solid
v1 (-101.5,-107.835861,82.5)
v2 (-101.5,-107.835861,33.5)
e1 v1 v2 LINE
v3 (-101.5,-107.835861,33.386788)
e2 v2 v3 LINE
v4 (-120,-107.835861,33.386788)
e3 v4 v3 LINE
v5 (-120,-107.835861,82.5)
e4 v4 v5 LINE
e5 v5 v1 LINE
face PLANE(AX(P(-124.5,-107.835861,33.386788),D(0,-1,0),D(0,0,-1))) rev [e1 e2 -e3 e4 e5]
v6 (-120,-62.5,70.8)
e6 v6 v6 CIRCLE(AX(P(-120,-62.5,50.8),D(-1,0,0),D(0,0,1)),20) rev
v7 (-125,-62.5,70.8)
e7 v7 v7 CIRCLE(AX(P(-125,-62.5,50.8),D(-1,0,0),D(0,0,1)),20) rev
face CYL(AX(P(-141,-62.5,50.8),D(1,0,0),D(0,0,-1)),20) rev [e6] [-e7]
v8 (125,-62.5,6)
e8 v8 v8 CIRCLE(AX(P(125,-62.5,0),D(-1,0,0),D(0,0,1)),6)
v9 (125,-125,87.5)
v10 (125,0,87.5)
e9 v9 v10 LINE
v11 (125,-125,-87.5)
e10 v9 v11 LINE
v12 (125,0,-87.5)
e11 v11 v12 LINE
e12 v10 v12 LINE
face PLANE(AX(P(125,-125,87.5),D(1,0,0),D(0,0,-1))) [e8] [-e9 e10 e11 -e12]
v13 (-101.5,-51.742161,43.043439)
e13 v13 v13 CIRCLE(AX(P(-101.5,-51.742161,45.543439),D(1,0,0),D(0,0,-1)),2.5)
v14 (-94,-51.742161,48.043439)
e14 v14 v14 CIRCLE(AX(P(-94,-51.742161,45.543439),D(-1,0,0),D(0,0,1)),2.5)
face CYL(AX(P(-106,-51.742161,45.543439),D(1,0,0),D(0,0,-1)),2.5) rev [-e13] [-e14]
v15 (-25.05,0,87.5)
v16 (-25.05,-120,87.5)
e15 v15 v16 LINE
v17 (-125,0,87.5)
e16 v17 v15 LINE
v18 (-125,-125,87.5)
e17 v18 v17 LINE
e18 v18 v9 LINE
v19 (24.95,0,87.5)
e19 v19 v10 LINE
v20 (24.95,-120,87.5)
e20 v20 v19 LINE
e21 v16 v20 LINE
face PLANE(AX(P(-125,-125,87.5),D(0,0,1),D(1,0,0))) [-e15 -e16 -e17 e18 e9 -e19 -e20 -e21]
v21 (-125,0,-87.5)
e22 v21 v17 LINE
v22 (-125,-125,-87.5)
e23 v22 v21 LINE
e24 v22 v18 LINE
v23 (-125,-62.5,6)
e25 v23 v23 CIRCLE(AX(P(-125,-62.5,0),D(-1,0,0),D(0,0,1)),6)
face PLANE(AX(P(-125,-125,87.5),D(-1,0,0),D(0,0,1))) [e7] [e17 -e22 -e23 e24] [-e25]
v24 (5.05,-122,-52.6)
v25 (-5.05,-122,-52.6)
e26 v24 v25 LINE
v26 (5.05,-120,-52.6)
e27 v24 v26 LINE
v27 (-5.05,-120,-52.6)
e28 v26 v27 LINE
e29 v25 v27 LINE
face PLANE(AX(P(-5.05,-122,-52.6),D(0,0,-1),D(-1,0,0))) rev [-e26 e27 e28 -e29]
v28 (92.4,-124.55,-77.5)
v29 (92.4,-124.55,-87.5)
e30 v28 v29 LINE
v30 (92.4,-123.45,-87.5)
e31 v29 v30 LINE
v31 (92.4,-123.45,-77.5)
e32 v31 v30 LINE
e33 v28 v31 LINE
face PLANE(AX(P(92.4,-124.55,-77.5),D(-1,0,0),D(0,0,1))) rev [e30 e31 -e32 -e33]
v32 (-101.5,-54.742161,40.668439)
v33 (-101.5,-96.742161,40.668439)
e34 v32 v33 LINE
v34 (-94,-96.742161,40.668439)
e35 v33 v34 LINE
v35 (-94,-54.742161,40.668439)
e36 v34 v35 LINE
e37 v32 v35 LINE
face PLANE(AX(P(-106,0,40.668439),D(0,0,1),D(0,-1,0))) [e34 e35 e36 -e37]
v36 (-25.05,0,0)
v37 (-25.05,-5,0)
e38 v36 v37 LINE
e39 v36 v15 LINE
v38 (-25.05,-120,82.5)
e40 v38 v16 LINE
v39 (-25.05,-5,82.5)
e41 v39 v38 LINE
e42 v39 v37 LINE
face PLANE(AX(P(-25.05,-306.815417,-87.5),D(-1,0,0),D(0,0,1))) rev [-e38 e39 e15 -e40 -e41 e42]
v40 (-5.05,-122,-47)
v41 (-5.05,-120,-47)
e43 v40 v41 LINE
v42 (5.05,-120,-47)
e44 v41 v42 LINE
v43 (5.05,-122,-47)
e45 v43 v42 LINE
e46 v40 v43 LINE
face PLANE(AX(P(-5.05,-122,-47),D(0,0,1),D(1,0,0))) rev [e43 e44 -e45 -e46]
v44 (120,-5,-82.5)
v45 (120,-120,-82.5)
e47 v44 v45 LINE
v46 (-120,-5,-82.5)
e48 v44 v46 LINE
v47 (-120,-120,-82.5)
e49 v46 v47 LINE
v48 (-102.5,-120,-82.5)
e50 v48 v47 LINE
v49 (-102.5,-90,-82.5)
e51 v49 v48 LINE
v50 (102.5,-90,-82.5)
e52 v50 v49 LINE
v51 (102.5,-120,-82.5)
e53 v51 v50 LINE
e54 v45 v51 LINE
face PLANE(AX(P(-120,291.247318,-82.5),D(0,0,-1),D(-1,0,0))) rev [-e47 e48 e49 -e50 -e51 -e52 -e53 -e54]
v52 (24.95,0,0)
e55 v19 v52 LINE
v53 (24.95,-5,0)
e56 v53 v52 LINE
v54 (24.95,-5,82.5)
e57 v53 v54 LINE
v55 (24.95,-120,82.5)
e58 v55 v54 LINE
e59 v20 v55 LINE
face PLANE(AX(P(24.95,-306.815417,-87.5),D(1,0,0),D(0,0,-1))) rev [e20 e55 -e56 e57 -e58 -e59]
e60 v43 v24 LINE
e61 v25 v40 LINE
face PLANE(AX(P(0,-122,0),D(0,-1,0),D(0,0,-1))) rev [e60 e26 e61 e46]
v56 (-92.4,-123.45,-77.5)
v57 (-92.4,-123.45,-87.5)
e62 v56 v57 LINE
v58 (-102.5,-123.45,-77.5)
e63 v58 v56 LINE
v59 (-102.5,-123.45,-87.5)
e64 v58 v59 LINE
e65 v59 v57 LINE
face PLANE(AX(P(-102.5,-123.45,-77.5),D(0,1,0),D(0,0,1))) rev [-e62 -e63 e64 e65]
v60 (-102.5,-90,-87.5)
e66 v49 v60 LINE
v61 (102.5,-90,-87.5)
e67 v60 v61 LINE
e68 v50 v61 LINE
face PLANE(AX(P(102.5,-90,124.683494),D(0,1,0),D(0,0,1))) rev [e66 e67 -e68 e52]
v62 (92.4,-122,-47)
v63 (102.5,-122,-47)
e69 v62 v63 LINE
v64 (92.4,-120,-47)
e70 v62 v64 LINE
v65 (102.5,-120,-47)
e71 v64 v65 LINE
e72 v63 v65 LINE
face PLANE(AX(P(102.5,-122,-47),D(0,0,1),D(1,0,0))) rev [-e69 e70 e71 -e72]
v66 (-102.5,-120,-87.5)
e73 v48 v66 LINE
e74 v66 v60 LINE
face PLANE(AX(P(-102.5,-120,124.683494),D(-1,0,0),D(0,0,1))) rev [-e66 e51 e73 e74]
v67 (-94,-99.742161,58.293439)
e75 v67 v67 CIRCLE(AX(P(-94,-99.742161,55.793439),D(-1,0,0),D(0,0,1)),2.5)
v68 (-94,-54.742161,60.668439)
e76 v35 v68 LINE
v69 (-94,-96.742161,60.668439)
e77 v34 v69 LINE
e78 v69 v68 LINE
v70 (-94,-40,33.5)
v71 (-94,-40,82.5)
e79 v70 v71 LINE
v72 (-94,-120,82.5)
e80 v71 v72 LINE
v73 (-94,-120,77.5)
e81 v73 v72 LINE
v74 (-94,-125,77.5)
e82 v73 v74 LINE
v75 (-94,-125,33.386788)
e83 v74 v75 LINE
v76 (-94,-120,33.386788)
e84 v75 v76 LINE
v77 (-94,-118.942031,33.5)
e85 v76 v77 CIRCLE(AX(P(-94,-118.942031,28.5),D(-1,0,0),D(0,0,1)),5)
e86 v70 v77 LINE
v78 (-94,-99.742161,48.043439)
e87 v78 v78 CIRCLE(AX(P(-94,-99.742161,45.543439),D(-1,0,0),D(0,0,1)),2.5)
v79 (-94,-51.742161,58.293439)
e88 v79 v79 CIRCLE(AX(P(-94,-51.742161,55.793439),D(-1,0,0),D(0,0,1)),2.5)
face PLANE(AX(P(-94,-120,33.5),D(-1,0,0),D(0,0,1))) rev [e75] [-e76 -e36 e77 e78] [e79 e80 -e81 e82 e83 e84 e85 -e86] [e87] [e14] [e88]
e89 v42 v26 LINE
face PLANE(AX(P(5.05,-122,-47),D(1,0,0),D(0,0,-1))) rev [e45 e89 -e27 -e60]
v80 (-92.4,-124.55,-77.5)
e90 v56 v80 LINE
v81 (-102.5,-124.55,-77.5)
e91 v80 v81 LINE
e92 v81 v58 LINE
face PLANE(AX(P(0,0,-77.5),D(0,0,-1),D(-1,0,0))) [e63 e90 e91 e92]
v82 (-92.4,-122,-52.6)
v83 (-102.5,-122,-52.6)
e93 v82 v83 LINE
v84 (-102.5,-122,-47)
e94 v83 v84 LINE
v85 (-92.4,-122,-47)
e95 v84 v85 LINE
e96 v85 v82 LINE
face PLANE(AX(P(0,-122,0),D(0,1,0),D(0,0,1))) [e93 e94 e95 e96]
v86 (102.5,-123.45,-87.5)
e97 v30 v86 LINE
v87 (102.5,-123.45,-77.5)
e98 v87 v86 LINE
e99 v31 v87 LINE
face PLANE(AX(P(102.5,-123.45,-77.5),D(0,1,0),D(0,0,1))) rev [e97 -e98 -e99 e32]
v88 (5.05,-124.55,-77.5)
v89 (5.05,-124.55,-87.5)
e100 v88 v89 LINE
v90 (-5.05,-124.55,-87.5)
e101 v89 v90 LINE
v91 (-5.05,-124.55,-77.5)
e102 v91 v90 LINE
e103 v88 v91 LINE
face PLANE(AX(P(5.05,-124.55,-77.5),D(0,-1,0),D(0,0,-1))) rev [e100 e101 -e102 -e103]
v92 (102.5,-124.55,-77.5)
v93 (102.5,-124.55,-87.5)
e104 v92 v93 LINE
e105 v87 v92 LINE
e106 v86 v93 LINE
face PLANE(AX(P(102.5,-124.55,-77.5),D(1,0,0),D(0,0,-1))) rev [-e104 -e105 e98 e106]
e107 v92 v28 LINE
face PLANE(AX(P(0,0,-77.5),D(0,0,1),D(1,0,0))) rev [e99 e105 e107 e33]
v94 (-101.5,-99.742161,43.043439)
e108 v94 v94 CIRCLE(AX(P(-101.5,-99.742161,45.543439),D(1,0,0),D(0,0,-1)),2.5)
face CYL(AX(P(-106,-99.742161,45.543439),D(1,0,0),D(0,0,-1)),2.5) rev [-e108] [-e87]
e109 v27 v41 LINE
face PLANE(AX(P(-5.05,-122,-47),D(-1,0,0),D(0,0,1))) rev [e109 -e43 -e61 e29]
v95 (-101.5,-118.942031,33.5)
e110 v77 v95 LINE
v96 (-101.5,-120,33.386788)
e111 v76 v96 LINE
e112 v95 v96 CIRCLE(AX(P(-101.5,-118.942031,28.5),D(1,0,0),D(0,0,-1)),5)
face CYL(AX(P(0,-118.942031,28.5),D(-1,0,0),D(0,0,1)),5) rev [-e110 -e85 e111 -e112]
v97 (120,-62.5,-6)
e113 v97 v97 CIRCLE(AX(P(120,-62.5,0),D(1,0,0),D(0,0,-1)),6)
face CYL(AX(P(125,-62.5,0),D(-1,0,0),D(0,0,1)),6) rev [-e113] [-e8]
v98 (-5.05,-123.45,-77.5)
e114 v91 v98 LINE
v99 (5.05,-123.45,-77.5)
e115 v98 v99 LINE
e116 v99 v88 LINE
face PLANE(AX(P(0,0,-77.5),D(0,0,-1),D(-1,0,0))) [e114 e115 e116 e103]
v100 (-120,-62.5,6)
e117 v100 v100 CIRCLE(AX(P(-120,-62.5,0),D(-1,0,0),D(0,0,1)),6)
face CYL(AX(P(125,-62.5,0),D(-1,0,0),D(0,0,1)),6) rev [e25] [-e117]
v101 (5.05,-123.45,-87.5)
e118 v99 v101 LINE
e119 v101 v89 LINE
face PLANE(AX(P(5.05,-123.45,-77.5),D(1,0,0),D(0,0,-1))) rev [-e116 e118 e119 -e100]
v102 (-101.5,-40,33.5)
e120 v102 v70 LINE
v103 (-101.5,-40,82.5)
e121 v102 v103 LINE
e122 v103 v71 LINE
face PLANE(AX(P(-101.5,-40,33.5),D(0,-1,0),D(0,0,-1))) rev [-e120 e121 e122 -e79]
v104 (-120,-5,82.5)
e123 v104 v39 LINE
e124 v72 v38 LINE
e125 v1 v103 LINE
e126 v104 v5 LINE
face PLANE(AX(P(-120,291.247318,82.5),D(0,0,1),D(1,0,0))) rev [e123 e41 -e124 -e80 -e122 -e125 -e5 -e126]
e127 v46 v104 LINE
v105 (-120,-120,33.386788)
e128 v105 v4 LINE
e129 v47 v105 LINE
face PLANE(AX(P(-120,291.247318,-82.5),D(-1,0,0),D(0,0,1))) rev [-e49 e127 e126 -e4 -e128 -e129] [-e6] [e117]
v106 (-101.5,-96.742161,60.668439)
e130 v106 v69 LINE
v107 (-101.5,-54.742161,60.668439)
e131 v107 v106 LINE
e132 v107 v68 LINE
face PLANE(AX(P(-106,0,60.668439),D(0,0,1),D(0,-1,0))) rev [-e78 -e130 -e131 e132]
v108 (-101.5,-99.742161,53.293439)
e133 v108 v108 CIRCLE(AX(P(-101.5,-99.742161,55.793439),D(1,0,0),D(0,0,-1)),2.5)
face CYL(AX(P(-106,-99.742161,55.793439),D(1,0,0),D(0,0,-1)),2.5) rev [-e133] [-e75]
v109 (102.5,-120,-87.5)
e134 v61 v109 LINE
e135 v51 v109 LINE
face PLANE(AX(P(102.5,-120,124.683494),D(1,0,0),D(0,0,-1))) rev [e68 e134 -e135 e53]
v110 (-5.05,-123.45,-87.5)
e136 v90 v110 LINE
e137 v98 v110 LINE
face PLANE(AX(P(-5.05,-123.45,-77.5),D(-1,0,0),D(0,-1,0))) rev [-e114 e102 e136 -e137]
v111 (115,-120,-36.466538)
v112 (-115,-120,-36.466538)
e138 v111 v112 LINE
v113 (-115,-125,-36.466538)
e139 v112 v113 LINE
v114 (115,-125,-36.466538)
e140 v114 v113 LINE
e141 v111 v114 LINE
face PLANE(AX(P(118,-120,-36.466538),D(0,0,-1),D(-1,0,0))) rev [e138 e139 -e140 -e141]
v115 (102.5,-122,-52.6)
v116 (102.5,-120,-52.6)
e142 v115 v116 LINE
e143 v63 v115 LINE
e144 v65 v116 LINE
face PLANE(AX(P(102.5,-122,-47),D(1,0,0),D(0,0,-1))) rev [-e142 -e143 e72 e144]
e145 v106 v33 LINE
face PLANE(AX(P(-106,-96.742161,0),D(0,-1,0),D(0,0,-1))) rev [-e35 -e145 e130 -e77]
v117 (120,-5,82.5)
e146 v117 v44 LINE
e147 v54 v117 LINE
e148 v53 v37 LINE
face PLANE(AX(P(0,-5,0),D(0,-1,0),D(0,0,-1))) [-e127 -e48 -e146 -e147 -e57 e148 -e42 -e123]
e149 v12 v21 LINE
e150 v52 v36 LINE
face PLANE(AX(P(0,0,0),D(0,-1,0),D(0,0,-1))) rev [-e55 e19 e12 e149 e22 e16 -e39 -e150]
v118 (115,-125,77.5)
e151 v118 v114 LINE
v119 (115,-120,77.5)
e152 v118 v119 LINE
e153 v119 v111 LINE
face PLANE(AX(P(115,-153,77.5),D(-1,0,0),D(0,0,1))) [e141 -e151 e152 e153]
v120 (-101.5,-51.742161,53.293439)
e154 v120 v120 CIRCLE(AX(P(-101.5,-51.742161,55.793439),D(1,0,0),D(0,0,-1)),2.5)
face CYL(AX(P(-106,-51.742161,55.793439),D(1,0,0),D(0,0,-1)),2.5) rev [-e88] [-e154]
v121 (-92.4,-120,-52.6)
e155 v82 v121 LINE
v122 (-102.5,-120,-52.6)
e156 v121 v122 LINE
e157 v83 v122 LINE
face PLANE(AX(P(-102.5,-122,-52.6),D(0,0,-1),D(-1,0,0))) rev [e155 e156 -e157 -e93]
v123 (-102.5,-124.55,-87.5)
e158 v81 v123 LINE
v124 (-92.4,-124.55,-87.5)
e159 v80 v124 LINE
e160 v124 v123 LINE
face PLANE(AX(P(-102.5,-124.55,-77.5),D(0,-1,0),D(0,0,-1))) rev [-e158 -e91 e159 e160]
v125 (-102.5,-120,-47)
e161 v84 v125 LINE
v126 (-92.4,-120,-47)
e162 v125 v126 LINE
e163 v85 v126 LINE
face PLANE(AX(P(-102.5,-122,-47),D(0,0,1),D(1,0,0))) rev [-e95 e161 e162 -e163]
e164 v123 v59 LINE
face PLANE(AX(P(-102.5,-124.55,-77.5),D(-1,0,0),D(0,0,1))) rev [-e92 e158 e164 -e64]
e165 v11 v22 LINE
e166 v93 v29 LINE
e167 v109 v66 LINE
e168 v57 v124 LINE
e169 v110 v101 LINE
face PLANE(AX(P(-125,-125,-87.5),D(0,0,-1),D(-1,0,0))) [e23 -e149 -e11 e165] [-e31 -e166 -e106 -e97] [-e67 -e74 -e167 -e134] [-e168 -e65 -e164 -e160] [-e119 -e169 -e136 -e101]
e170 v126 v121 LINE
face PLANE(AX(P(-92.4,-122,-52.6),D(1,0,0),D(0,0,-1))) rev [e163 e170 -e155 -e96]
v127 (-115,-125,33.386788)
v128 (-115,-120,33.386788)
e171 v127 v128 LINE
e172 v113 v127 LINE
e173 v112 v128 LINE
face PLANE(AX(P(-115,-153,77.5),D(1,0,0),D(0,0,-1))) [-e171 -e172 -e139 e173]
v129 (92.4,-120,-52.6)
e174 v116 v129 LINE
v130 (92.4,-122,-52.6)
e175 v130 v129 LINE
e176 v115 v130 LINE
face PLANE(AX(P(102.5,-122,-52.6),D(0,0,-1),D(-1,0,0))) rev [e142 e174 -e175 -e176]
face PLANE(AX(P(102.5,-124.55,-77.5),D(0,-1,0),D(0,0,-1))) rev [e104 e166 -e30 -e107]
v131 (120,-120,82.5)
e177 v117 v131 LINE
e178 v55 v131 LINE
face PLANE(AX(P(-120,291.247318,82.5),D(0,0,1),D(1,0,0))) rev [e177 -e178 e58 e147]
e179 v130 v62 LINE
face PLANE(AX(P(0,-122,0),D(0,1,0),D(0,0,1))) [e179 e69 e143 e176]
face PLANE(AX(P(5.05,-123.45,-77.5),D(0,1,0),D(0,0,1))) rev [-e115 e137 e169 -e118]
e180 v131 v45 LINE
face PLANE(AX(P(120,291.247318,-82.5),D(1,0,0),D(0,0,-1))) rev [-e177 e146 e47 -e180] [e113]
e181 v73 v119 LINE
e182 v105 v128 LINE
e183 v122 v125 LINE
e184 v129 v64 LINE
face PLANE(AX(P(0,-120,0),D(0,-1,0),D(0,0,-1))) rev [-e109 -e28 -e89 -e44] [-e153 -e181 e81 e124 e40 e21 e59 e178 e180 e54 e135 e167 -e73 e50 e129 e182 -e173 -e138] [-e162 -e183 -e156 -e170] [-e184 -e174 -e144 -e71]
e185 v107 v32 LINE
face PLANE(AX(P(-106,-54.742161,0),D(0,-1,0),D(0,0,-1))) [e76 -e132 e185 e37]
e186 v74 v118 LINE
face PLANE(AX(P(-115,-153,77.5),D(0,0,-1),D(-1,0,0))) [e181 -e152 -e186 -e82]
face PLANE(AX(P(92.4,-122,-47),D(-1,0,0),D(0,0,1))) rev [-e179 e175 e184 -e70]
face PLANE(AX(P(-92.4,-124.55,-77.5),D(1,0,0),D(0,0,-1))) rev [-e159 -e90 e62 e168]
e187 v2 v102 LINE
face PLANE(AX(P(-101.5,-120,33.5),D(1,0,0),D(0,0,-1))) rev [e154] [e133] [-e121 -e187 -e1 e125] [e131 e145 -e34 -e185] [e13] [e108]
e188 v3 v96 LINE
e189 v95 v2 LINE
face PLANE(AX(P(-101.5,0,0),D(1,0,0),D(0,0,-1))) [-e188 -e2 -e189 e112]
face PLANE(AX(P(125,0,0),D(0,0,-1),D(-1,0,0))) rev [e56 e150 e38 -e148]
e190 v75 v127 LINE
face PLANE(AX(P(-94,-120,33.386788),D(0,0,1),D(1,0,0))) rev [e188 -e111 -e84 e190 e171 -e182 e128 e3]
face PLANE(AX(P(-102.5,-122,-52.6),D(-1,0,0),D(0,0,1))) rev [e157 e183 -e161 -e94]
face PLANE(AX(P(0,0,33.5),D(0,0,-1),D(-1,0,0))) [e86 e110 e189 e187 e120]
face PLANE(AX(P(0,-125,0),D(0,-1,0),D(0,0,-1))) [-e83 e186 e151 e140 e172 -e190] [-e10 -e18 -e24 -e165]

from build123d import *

# Parameters (mm, degrees)
SKETCH1_W               = 250
SKETCH1_H               = 175
BOSS_EXTRUDE1_DEPTH     = 125
SKETCH2_W               = 240
SKETCH2_H               = 165
CUT_EXTRUDE1_DEPTH      = 120
SKETCH3_W               = 40.1
SKETCH3_H               = 165
CUT_EXTRUDE2_DEPTH      = 198.246672976
SKETCH6_W               = 250
SKETCH6_H               = 175
BOSS_EXTRUDE2_DEPTH     = 5
SKETCH7_W               = 205
SKETCH7_H               = 30
PIANO_PLUG_DEPTH        = 5
ARM_HOLE_REACH          = 199.247
SKETCH8_W               = 50
SKETCH8_H               = 180
BOSS_EXTRUDE8_REACH     = 216.001
SKETCH4_R               = 6
MAIN_SHAFT_HOLE_DEPTH   = 293.884362846
CUT_EXTRUDE8_DEPTH      = 16
CUT_EXTRUDE8_DEPTH_BACK = 33
SKETCH10_R              = 20
BOTTOM_OPEN_DEPTH       = 28
BOTTOM_OPEN_DEPTH_BACK  = 21
SKETCH11_W              = 230
SKETCH11_H              = 155
SKETCH12_W              = 41.033462292
SKETCH12_H              = 5
BOSS_EXTRUDE4_DEPTH     = 233
SKETCH13_W              = 7.5
SKETCH13_H              = 80
BOSS_EXTRUDE5_DEPTH     = 49
SKETCH14_W              = 44.113211518
SKETCH14_H              = 5
BOSS_EXTRUDE6_DEPTH     = 21
FILLET2_R               = 5
SKETCH16_R              = 2.5
SKETCH16_W              = 20
SKETCH16_H              = 42
SERVO_PLUG_HOLE_DEPTH   = 106
SKETCH17_W              = 49.113211518
SKETCH17_H              = 12.164138601
BOSS_EXTRUDE7_DEPTH     = 23
SKETCH19_W              = 10.1
SKETCH19_H              = 5.6
CUT_EXTRUDE9_DEPTH      = 2
SKETCH21_W              = 10.1
SKETCH21_H              = 1.1
CUT_EXTRUDE10_DEPTH     = 10


with BuildPart() as part:
    # Sketch1 → Boss-Extrude1 (new body)
    with BuildSketch(Plane(origin=(0, 0, 0), x_dir=(1, 0, 0), z_dir=(0, 1, 0))):
        Rectangle(SKETCH1_W, SKETCH1_H)
    extrude(amount=-BOSS_EXTRUDE1_DEPTH)

    # Sketch2 → Cut-Extrude1 (cut)
    with BuildSketch(Plane.XZ.offset(125)):
        Rectangle(SKETCH2_W, SKETCH2_H)
    extrude(amount=-CUT_EXTRUDE1_DEPTH, mode=Mode.SUBTRACT)

    # Sketch3 → Cut-Extrude2 (cut, through all)
    with BuildSketch(Plane(origin=(0, 0, 0), x_dir=(1, 0, 0), z_dir=(0, 1, 0))):
        Rectangle(SKETCH3_W, SKETCH3_H)
    extrude(amount=-CUT_EXTRUDE2_DEPTH, mode=Mode.SUBTRACT)

    # Sketch6 → Boss-Extrude2 (add)
    with BuildSketch(Plane.XZ.offset(125)):
        Rectangle(SKETCH6_W, SKETCH6_H)
    extrude(amount=-BOSS_EXTRUDE2_DEPTH)

    # Sketch7 → Piano Plug (cut)
    with BuildSketch(Plane(origin=(0, 0, -87.5), x_dir=(-1, 0, 0), z_dir=(0, 0, -1))):
        with Locations((0, -105)):
            Rectangle(SKETCH7_W, SKETCH7_H)
    extrude(amount=-PIANO_PLUG_DEPTH, mode=Mode.SUBTRACT)

    # Arm Hole: up to this face of the body (flat: up to its plane)
    arm_hole_end = Plane(part.part.faces().sort_by_distance((0, -120, -2.144615385))[0])
    # Sketch8 → Arm Hole (cut, up to the picked face)
    with BuildSketch(Plane(origin=(0, 0, 0), x_dir=(1, 0, 0), z_dir=(0, 1, 0)), mode=Mode.PRIVATE) as arm_hole_sk1:
        with Locations((-0.05, -2.5)):
            Rectangle(SKETCH8_W, SKETCH8_H)
    arm_hole_tool1 = split(extrude(arm_hole_sk1.sketch, amount=-ARM_HOLE_REACH, mode=Mode.PRIVATE), bisect_by=arm_hole_end, keep=Keep.BOTH, mode=Mode.PRIVATE)
    add(arm_hole_tool1.solids().sort_by(Axis((-0.05, 0, 2.5), (0, -1, 0)))[0], mode=Mode.SUBTRACT)

    # Sketch9 → Boss-Extrude8 (add, up to next)
    with BuildSketch(Plane(origin=(-25.05, 0, 0), x_dir=(0, 0, -1), z_dir=(1, 0, 0)), mode=Mode.PRIVATE) as boss_extrude8_sk1:
        Polygon((87.5, 0), (87.5, -90), (82.5, -90), (82.5, -5), (0, -5), (0, 0), align=None)
    boss_extrude8_tool1 = extrude(boss_extrude8_sk1.sketch, amount=BOSS_EXTRUDE8_REACH, mode=Mode.PRIVATE) - part.part
    add(boss_extrude8_tool1.solids().sort_by_distance((-25.05, -45, -86.244761))[0])

    # Sketch4 → Main Shaft Hole (cut, through all)
    with BuildSketch(Plane.ZY.offset(125)):
        with Locations((0, -62.5)):
            Circle(SKETCH4_R)
    extrude(amount=-MAIN_SHAFT_HOLE_DEPTH, mode=Mode.SUBTRACT)

    # Sketch10 → Cut-Extrude8 (cut, two sides: drawn at the far end of the back side and taken through both)
    with BuildSketch(Plane.ZY.offset(125).offset(-CUT_EXTRUDE8_DEPTH_BACK)):
        with Locations((50.8, -62.5)):
            Circle(SKETCH10_R)
    extrude(amount=CUT_EXTRUDE8_DEPTH + CUT_EXTRUDE8_DEPTH_BACK, mode=Mode.SUBTRACT)

    # Sketch11 → Bottom Open (cut, two sides: drawn at the far end of the back side and taken through both)
    with BuildSketch(Plane(origin=(0, -125, 0), x_dir=(-1, 0, 0), z_dir=(0, -1, 0)).offset(-BOTTOM_OPEN_DEPTH_BACK)):
        Rectangle(SKETCH11_W, SKETCH11_H)
    extrude(amount=BOTTOM_OPEN_DEPTH + BOTTOM_OPEN_DEPTH_BACK, mode=Mode.SUBTRACT)

    # Sketch12 → Boss-Extrude4 (add)
    with BuildSketch(Plane(origin=(-115, 0, 0), x_dir=(0, 0, -1), z_dir=(1, 0, 0))):
        with Locations((56.983268854, -122.5)):
            Rectangle(SKETCH12_W, SKETCH12_H)
    extrude(amount=BOSS_EXTRUDE4_DEPTH)

    # Sketch13 → Boss-Extrude5 (add)
    with BuildSketch(Plane(origin=(0, 0, 82.5), x_dir=(-1, 0, 0), z_dir=(0, 0, -1))):
        with Locations((97.75, -80)):
            Rectangle(SKETCH13_W, SKETCH13_H)
    extrude(amount=BOSS_EXTRUDE5_DEPTH)

    # Sketch14 → Boss-Extrude6 (add)
    with BuildSketch(Plane(origin=(-115, 0, 0), x_dir=(0, 0, -1), z_dir=(1, 0, 0))):
        with Locations((-55.443394241, -122.5)):
            Rectangle(SKETCH14_W, SKETCH14_H)
    extrude(amount=BOSS_EXTRUDE6_DEPTH)

    # Fillet2
    # the kernel refuses this fillet: 5 mm, written as the material it adds along each edge
    with BuildSketch(Plane(origin=(-101.5, -120, 33.5), x_dir=(0, 1, 0), z_dir=(1, 0, 0))) as fillet2_piece_1:
        with BuildLine():
            CenterArc((1.057968965, -5), FILLET2_R, 90, 12.215768954)
            Line((0, -0.113211518), (-0.021159379, -0.015475748))
            ThreePointArc((-0.021159379, -0.015475748), (-0.1, -0.056605759), (-0.1, 0))
            Line((-0.1, 0), (0, 0.1))
            Line((0, 0.1), (1.057968965, 0.1))
            Line((1.057968965, 0.1), (1.057968965, 0))
        make_face()
    extrude(amount=7.5)

    # Sketch16 → Servo Plug Hole (cut)
    with BuildSketch(Plane(origin=(0, 0, 0), x_dir=(0, 0, -1), z_dir=(1, 0, 0))):
        with Locations((-45.543439041, -51.74216133)):
            Circle(SKETCH16_R)
        with Locations((-55.793439041, -51.74216133)):
            Circle(SKETCH16_R)
        with Locations((-50.668439041, -75.74216133)):
            Rectangle(SKETCH16_W, SKETCH16_H)
        with Locations((-45.543439041, -99.74216133)):
            Circle(SKETCH16_R)
        with Locations((-55.793439041, -99.74216133)):
            Circle(SKETCH16_R)
    extrude(amount=-SERVO_PLUG_HOLE_DEPTH, mode=Mode.SUBTRACT)

    # Sketch17 → Boss-Extrude7 (add)
    with BuildSketch(Plane.ZY.offset(101.5)):
        with Locations((57.943394241, -113.9179307)):
            Rectangle(SKETCH17_W, SKETCH17_H)
    extrude(amount=BOSS_EXTRUDE7_DEPTH)

    # Sketch19 → Cut-Extrude9 (cut)
    with BuildSketch(Plane(origin=(0, -120, 0), x_dir=(1, 0, 0), z_dir=(0, 1, 0))):
        with Locations((97.45, 49.8)):
            Rectangle(SKETCH19_W, SKETCH19_H)
        with Locations((-97.45, 49.8)):
            Rectangle(SKETCH19_W, SKETCH19_H)
        with Locations((0, 49.8)):
            Rectangle(SKETCH19_W, SKETCH19_H)
    extrude(amount=-CUT_EXTRUDE9_DEPTH, mode=Mode.SUBTRACT)

    # Sketch21 → Cut-Extrude10 (cut)
    with BuildSketch(Plane(origin=(0, 0, -87.5), x_dir=(-1, 0, 0), z_dir=(0, 0, -1))):
        with Locations((-97.45, -124)):
            Rectangle(SKETCH21_W, SKETCH21_H)
        with Locations((97.45, -124)):
            Rectangle(SKETCH21_W, SKETCH21_H)
        with Locations((0, -124)):
            Rectangle(SKETCH21_W, SKETCH21_H)
    extrude(amount=-CUT_EXTRUDE10_DEPTH, mode=Mode.SUBTRACT)


solid = part.part
